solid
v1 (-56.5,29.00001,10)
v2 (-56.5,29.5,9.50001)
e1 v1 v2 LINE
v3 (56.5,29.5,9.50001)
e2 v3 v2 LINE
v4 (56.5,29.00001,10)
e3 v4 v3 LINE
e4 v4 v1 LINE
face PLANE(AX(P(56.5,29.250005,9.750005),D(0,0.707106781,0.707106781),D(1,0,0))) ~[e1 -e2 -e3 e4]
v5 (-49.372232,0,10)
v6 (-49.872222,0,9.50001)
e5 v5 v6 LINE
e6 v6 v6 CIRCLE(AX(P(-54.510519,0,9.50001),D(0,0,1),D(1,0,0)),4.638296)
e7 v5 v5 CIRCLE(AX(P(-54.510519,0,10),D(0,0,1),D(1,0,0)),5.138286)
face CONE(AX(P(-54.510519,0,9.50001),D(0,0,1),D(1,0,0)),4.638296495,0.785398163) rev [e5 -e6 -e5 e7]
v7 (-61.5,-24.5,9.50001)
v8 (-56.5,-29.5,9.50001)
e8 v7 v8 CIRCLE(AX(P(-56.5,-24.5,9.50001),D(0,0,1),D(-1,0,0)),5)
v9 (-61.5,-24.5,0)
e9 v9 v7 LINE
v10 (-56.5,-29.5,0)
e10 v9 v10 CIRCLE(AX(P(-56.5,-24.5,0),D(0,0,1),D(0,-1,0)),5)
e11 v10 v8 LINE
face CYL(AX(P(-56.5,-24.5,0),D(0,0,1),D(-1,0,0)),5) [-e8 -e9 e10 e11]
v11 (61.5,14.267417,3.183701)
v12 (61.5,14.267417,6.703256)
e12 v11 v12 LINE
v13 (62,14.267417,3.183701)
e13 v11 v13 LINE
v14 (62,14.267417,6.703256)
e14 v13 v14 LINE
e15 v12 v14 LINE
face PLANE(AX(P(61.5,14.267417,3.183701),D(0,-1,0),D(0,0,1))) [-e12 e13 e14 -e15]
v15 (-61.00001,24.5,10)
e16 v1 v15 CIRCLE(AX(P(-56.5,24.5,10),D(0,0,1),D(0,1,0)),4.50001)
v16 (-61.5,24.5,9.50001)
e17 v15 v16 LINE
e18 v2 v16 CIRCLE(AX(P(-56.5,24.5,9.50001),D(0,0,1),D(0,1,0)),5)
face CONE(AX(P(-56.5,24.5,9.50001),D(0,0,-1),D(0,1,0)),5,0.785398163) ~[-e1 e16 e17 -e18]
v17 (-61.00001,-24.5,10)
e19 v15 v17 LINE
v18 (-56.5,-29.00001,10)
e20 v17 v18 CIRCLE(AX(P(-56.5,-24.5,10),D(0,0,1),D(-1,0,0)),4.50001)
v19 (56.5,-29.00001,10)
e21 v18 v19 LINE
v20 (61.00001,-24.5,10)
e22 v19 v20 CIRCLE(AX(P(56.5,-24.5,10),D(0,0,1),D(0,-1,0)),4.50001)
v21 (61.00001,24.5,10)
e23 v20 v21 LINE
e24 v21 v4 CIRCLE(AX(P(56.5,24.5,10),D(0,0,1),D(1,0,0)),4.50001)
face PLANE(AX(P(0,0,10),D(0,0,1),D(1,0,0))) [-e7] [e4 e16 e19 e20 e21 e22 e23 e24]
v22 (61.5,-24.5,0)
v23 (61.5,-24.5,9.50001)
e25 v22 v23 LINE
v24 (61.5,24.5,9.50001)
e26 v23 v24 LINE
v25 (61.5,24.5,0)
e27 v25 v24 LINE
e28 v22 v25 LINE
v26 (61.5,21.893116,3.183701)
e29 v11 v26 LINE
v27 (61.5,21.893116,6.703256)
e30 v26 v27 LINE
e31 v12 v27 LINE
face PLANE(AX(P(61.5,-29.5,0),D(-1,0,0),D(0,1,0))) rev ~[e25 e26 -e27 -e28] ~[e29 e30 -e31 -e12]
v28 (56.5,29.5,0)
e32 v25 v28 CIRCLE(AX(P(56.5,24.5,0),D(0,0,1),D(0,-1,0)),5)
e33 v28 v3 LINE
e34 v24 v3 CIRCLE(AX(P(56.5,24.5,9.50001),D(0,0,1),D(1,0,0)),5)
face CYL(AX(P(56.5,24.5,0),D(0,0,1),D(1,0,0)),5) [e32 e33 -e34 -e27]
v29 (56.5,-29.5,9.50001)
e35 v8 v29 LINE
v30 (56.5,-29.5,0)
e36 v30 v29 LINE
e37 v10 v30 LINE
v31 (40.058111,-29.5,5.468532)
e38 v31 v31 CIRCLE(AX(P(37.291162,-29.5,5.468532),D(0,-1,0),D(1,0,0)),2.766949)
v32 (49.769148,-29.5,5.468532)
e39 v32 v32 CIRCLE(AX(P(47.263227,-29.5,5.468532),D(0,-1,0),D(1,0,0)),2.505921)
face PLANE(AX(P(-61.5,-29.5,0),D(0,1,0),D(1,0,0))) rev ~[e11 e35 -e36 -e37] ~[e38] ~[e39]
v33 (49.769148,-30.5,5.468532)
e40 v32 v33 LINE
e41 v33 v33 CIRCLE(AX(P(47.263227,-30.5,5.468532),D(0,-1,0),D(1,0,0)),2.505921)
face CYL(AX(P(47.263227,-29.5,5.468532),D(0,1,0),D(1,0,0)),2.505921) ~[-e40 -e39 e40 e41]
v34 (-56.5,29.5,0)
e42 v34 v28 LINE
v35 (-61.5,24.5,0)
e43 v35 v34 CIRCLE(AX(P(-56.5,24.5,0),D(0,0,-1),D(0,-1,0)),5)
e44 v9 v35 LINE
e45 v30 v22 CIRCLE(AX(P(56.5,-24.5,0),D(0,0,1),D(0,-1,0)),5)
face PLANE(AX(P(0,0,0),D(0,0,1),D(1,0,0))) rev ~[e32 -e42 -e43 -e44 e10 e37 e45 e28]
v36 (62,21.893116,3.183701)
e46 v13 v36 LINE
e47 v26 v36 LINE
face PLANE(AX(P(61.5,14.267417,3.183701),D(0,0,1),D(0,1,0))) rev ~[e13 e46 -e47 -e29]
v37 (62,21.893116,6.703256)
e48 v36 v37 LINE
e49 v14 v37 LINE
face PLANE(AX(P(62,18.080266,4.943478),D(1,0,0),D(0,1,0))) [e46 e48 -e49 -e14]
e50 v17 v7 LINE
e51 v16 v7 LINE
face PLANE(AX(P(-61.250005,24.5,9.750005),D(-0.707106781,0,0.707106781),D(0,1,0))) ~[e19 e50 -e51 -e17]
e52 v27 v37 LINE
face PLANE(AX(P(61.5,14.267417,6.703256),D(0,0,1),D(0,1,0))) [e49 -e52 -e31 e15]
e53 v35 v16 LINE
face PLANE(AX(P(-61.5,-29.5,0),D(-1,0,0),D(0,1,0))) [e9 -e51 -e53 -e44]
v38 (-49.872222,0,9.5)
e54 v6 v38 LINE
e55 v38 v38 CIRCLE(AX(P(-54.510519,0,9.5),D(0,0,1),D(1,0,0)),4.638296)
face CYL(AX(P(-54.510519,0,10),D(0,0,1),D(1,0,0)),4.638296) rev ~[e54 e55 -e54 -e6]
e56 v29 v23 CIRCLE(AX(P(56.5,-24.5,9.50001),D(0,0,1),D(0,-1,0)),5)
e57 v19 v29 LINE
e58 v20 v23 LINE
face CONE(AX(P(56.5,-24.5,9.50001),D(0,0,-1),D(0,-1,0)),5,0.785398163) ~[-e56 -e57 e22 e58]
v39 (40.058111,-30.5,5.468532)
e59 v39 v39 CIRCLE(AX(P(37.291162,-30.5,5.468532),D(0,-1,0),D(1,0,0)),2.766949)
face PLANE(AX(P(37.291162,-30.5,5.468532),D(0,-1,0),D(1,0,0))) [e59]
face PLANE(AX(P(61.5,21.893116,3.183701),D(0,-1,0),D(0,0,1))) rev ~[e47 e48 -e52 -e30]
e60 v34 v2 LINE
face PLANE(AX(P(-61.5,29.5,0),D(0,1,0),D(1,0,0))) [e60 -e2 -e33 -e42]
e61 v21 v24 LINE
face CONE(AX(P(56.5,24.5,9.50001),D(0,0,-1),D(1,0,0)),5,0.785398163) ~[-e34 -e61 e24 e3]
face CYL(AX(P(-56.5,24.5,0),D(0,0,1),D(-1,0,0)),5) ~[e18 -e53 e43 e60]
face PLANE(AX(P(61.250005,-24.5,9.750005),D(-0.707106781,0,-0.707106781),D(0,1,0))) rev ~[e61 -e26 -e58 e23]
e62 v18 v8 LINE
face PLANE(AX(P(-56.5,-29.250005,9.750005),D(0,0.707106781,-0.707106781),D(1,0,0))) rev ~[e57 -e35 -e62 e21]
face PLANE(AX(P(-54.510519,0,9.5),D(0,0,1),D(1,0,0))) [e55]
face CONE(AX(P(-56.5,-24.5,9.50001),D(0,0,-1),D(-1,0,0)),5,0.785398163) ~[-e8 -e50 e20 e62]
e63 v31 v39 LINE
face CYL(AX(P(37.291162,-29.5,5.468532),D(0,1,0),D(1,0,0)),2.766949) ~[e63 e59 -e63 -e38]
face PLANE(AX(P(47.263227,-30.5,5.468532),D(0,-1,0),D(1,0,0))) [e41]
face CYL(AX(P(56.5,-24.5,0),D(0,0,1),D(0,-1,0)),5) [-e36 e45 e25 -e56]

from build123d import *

# Parameters (mm, degrees)
F0_W     = 123
F0_H     = 59
F1_DEPTH = 10
F2_R     = 5
F3_R     = 5
F4_R     = 2.7669489105
F4_R_2   = 2.5059208377
F5_DEPTH = 1
F6_W     = 7.6256990433
F6_H     = 3.5195555538
F7_DEPTH = 0.5
F8_R     = 4.6382964955
F9_DEPTH = 0.5
F10_SIZE = 0.49999


# Not quite as in the source:
# - a fillet or chamfer is up to 0.001 mm smaller than in the source, because OpenCascade refuses the exact size


with BuildPart() as f1:
    # F0 (on Top) → F1 (new body)
    with BuildSketch(Plane.XY):
        Rectangle(F0_W, F0_H)
    extrude(amount=F1_DEPTH)

    # F2
    f2_edges = [f1.edges().sort_by_distance(p)[0] for p in [
        (-61.5, 29.5, 5),
        (61.5, 29.5, 5),
    ]]
    fillet(f2_edges, radius=F2_R)

    # F3
    f3_edges = [f1.edges().sort_by_distance(p)[0] for p in [
        (-61.5, -29.5, 5),
        (61.5, -29.5, 5),
    ]]
    fillet(f3_edges, radius=F3_R)

    # F4 (on face) → F5 (join)
    with BuildSketch(Plane.XZ.offset(29.5)):
        with Locations((37.291161716, 5.468532443)):
            Circle(F4_R)
        with Locations((47.2632274032, 5.468532443)):
            Circle(F4_R_2)
    extrude(amount=F5_DEPTH)

    # F6 (on face) → F7 (join)
    with BuildSketch(Plane.YZ.offset(61.5)):
        with Locations((18.0802661926, 4.9434783868)):
            Rectangle(F6_W, F6_H)
    extrude(amount=F7_DEPTH)

    # F8 (on face) → F9 (cut)
    with BuildSketch(Plane.XY.offset(10)):
        with Locations((-54.5105189085, 0)):
            Circle(F8_R)
    extrude(amount=-F9_DEPTH, mode=Mode.SUBTRACT)

    # F10 (size 0.5 in the source; OpenCascade refuses exactly that, so slightly less here)
    f10_edges = [f1.edges().sort_by_distance(p)[0] for p in [
        (61.5, 0, 10),
        (60.035534, -28.035534, 10),
        (60.035534, 28.035534, 10),
        (0, -29.5, 10),
        (0, 29.5, 10),
        (-60.035534, -28.035534, 10),
        (-60.035534, 28.035534, 10),
        (-61.5, 0, 10),
        (-59.148815, 0, 10),
    ]]
    chamfer(f10_edges, length=F10_SIZE)


solid = f1.part
